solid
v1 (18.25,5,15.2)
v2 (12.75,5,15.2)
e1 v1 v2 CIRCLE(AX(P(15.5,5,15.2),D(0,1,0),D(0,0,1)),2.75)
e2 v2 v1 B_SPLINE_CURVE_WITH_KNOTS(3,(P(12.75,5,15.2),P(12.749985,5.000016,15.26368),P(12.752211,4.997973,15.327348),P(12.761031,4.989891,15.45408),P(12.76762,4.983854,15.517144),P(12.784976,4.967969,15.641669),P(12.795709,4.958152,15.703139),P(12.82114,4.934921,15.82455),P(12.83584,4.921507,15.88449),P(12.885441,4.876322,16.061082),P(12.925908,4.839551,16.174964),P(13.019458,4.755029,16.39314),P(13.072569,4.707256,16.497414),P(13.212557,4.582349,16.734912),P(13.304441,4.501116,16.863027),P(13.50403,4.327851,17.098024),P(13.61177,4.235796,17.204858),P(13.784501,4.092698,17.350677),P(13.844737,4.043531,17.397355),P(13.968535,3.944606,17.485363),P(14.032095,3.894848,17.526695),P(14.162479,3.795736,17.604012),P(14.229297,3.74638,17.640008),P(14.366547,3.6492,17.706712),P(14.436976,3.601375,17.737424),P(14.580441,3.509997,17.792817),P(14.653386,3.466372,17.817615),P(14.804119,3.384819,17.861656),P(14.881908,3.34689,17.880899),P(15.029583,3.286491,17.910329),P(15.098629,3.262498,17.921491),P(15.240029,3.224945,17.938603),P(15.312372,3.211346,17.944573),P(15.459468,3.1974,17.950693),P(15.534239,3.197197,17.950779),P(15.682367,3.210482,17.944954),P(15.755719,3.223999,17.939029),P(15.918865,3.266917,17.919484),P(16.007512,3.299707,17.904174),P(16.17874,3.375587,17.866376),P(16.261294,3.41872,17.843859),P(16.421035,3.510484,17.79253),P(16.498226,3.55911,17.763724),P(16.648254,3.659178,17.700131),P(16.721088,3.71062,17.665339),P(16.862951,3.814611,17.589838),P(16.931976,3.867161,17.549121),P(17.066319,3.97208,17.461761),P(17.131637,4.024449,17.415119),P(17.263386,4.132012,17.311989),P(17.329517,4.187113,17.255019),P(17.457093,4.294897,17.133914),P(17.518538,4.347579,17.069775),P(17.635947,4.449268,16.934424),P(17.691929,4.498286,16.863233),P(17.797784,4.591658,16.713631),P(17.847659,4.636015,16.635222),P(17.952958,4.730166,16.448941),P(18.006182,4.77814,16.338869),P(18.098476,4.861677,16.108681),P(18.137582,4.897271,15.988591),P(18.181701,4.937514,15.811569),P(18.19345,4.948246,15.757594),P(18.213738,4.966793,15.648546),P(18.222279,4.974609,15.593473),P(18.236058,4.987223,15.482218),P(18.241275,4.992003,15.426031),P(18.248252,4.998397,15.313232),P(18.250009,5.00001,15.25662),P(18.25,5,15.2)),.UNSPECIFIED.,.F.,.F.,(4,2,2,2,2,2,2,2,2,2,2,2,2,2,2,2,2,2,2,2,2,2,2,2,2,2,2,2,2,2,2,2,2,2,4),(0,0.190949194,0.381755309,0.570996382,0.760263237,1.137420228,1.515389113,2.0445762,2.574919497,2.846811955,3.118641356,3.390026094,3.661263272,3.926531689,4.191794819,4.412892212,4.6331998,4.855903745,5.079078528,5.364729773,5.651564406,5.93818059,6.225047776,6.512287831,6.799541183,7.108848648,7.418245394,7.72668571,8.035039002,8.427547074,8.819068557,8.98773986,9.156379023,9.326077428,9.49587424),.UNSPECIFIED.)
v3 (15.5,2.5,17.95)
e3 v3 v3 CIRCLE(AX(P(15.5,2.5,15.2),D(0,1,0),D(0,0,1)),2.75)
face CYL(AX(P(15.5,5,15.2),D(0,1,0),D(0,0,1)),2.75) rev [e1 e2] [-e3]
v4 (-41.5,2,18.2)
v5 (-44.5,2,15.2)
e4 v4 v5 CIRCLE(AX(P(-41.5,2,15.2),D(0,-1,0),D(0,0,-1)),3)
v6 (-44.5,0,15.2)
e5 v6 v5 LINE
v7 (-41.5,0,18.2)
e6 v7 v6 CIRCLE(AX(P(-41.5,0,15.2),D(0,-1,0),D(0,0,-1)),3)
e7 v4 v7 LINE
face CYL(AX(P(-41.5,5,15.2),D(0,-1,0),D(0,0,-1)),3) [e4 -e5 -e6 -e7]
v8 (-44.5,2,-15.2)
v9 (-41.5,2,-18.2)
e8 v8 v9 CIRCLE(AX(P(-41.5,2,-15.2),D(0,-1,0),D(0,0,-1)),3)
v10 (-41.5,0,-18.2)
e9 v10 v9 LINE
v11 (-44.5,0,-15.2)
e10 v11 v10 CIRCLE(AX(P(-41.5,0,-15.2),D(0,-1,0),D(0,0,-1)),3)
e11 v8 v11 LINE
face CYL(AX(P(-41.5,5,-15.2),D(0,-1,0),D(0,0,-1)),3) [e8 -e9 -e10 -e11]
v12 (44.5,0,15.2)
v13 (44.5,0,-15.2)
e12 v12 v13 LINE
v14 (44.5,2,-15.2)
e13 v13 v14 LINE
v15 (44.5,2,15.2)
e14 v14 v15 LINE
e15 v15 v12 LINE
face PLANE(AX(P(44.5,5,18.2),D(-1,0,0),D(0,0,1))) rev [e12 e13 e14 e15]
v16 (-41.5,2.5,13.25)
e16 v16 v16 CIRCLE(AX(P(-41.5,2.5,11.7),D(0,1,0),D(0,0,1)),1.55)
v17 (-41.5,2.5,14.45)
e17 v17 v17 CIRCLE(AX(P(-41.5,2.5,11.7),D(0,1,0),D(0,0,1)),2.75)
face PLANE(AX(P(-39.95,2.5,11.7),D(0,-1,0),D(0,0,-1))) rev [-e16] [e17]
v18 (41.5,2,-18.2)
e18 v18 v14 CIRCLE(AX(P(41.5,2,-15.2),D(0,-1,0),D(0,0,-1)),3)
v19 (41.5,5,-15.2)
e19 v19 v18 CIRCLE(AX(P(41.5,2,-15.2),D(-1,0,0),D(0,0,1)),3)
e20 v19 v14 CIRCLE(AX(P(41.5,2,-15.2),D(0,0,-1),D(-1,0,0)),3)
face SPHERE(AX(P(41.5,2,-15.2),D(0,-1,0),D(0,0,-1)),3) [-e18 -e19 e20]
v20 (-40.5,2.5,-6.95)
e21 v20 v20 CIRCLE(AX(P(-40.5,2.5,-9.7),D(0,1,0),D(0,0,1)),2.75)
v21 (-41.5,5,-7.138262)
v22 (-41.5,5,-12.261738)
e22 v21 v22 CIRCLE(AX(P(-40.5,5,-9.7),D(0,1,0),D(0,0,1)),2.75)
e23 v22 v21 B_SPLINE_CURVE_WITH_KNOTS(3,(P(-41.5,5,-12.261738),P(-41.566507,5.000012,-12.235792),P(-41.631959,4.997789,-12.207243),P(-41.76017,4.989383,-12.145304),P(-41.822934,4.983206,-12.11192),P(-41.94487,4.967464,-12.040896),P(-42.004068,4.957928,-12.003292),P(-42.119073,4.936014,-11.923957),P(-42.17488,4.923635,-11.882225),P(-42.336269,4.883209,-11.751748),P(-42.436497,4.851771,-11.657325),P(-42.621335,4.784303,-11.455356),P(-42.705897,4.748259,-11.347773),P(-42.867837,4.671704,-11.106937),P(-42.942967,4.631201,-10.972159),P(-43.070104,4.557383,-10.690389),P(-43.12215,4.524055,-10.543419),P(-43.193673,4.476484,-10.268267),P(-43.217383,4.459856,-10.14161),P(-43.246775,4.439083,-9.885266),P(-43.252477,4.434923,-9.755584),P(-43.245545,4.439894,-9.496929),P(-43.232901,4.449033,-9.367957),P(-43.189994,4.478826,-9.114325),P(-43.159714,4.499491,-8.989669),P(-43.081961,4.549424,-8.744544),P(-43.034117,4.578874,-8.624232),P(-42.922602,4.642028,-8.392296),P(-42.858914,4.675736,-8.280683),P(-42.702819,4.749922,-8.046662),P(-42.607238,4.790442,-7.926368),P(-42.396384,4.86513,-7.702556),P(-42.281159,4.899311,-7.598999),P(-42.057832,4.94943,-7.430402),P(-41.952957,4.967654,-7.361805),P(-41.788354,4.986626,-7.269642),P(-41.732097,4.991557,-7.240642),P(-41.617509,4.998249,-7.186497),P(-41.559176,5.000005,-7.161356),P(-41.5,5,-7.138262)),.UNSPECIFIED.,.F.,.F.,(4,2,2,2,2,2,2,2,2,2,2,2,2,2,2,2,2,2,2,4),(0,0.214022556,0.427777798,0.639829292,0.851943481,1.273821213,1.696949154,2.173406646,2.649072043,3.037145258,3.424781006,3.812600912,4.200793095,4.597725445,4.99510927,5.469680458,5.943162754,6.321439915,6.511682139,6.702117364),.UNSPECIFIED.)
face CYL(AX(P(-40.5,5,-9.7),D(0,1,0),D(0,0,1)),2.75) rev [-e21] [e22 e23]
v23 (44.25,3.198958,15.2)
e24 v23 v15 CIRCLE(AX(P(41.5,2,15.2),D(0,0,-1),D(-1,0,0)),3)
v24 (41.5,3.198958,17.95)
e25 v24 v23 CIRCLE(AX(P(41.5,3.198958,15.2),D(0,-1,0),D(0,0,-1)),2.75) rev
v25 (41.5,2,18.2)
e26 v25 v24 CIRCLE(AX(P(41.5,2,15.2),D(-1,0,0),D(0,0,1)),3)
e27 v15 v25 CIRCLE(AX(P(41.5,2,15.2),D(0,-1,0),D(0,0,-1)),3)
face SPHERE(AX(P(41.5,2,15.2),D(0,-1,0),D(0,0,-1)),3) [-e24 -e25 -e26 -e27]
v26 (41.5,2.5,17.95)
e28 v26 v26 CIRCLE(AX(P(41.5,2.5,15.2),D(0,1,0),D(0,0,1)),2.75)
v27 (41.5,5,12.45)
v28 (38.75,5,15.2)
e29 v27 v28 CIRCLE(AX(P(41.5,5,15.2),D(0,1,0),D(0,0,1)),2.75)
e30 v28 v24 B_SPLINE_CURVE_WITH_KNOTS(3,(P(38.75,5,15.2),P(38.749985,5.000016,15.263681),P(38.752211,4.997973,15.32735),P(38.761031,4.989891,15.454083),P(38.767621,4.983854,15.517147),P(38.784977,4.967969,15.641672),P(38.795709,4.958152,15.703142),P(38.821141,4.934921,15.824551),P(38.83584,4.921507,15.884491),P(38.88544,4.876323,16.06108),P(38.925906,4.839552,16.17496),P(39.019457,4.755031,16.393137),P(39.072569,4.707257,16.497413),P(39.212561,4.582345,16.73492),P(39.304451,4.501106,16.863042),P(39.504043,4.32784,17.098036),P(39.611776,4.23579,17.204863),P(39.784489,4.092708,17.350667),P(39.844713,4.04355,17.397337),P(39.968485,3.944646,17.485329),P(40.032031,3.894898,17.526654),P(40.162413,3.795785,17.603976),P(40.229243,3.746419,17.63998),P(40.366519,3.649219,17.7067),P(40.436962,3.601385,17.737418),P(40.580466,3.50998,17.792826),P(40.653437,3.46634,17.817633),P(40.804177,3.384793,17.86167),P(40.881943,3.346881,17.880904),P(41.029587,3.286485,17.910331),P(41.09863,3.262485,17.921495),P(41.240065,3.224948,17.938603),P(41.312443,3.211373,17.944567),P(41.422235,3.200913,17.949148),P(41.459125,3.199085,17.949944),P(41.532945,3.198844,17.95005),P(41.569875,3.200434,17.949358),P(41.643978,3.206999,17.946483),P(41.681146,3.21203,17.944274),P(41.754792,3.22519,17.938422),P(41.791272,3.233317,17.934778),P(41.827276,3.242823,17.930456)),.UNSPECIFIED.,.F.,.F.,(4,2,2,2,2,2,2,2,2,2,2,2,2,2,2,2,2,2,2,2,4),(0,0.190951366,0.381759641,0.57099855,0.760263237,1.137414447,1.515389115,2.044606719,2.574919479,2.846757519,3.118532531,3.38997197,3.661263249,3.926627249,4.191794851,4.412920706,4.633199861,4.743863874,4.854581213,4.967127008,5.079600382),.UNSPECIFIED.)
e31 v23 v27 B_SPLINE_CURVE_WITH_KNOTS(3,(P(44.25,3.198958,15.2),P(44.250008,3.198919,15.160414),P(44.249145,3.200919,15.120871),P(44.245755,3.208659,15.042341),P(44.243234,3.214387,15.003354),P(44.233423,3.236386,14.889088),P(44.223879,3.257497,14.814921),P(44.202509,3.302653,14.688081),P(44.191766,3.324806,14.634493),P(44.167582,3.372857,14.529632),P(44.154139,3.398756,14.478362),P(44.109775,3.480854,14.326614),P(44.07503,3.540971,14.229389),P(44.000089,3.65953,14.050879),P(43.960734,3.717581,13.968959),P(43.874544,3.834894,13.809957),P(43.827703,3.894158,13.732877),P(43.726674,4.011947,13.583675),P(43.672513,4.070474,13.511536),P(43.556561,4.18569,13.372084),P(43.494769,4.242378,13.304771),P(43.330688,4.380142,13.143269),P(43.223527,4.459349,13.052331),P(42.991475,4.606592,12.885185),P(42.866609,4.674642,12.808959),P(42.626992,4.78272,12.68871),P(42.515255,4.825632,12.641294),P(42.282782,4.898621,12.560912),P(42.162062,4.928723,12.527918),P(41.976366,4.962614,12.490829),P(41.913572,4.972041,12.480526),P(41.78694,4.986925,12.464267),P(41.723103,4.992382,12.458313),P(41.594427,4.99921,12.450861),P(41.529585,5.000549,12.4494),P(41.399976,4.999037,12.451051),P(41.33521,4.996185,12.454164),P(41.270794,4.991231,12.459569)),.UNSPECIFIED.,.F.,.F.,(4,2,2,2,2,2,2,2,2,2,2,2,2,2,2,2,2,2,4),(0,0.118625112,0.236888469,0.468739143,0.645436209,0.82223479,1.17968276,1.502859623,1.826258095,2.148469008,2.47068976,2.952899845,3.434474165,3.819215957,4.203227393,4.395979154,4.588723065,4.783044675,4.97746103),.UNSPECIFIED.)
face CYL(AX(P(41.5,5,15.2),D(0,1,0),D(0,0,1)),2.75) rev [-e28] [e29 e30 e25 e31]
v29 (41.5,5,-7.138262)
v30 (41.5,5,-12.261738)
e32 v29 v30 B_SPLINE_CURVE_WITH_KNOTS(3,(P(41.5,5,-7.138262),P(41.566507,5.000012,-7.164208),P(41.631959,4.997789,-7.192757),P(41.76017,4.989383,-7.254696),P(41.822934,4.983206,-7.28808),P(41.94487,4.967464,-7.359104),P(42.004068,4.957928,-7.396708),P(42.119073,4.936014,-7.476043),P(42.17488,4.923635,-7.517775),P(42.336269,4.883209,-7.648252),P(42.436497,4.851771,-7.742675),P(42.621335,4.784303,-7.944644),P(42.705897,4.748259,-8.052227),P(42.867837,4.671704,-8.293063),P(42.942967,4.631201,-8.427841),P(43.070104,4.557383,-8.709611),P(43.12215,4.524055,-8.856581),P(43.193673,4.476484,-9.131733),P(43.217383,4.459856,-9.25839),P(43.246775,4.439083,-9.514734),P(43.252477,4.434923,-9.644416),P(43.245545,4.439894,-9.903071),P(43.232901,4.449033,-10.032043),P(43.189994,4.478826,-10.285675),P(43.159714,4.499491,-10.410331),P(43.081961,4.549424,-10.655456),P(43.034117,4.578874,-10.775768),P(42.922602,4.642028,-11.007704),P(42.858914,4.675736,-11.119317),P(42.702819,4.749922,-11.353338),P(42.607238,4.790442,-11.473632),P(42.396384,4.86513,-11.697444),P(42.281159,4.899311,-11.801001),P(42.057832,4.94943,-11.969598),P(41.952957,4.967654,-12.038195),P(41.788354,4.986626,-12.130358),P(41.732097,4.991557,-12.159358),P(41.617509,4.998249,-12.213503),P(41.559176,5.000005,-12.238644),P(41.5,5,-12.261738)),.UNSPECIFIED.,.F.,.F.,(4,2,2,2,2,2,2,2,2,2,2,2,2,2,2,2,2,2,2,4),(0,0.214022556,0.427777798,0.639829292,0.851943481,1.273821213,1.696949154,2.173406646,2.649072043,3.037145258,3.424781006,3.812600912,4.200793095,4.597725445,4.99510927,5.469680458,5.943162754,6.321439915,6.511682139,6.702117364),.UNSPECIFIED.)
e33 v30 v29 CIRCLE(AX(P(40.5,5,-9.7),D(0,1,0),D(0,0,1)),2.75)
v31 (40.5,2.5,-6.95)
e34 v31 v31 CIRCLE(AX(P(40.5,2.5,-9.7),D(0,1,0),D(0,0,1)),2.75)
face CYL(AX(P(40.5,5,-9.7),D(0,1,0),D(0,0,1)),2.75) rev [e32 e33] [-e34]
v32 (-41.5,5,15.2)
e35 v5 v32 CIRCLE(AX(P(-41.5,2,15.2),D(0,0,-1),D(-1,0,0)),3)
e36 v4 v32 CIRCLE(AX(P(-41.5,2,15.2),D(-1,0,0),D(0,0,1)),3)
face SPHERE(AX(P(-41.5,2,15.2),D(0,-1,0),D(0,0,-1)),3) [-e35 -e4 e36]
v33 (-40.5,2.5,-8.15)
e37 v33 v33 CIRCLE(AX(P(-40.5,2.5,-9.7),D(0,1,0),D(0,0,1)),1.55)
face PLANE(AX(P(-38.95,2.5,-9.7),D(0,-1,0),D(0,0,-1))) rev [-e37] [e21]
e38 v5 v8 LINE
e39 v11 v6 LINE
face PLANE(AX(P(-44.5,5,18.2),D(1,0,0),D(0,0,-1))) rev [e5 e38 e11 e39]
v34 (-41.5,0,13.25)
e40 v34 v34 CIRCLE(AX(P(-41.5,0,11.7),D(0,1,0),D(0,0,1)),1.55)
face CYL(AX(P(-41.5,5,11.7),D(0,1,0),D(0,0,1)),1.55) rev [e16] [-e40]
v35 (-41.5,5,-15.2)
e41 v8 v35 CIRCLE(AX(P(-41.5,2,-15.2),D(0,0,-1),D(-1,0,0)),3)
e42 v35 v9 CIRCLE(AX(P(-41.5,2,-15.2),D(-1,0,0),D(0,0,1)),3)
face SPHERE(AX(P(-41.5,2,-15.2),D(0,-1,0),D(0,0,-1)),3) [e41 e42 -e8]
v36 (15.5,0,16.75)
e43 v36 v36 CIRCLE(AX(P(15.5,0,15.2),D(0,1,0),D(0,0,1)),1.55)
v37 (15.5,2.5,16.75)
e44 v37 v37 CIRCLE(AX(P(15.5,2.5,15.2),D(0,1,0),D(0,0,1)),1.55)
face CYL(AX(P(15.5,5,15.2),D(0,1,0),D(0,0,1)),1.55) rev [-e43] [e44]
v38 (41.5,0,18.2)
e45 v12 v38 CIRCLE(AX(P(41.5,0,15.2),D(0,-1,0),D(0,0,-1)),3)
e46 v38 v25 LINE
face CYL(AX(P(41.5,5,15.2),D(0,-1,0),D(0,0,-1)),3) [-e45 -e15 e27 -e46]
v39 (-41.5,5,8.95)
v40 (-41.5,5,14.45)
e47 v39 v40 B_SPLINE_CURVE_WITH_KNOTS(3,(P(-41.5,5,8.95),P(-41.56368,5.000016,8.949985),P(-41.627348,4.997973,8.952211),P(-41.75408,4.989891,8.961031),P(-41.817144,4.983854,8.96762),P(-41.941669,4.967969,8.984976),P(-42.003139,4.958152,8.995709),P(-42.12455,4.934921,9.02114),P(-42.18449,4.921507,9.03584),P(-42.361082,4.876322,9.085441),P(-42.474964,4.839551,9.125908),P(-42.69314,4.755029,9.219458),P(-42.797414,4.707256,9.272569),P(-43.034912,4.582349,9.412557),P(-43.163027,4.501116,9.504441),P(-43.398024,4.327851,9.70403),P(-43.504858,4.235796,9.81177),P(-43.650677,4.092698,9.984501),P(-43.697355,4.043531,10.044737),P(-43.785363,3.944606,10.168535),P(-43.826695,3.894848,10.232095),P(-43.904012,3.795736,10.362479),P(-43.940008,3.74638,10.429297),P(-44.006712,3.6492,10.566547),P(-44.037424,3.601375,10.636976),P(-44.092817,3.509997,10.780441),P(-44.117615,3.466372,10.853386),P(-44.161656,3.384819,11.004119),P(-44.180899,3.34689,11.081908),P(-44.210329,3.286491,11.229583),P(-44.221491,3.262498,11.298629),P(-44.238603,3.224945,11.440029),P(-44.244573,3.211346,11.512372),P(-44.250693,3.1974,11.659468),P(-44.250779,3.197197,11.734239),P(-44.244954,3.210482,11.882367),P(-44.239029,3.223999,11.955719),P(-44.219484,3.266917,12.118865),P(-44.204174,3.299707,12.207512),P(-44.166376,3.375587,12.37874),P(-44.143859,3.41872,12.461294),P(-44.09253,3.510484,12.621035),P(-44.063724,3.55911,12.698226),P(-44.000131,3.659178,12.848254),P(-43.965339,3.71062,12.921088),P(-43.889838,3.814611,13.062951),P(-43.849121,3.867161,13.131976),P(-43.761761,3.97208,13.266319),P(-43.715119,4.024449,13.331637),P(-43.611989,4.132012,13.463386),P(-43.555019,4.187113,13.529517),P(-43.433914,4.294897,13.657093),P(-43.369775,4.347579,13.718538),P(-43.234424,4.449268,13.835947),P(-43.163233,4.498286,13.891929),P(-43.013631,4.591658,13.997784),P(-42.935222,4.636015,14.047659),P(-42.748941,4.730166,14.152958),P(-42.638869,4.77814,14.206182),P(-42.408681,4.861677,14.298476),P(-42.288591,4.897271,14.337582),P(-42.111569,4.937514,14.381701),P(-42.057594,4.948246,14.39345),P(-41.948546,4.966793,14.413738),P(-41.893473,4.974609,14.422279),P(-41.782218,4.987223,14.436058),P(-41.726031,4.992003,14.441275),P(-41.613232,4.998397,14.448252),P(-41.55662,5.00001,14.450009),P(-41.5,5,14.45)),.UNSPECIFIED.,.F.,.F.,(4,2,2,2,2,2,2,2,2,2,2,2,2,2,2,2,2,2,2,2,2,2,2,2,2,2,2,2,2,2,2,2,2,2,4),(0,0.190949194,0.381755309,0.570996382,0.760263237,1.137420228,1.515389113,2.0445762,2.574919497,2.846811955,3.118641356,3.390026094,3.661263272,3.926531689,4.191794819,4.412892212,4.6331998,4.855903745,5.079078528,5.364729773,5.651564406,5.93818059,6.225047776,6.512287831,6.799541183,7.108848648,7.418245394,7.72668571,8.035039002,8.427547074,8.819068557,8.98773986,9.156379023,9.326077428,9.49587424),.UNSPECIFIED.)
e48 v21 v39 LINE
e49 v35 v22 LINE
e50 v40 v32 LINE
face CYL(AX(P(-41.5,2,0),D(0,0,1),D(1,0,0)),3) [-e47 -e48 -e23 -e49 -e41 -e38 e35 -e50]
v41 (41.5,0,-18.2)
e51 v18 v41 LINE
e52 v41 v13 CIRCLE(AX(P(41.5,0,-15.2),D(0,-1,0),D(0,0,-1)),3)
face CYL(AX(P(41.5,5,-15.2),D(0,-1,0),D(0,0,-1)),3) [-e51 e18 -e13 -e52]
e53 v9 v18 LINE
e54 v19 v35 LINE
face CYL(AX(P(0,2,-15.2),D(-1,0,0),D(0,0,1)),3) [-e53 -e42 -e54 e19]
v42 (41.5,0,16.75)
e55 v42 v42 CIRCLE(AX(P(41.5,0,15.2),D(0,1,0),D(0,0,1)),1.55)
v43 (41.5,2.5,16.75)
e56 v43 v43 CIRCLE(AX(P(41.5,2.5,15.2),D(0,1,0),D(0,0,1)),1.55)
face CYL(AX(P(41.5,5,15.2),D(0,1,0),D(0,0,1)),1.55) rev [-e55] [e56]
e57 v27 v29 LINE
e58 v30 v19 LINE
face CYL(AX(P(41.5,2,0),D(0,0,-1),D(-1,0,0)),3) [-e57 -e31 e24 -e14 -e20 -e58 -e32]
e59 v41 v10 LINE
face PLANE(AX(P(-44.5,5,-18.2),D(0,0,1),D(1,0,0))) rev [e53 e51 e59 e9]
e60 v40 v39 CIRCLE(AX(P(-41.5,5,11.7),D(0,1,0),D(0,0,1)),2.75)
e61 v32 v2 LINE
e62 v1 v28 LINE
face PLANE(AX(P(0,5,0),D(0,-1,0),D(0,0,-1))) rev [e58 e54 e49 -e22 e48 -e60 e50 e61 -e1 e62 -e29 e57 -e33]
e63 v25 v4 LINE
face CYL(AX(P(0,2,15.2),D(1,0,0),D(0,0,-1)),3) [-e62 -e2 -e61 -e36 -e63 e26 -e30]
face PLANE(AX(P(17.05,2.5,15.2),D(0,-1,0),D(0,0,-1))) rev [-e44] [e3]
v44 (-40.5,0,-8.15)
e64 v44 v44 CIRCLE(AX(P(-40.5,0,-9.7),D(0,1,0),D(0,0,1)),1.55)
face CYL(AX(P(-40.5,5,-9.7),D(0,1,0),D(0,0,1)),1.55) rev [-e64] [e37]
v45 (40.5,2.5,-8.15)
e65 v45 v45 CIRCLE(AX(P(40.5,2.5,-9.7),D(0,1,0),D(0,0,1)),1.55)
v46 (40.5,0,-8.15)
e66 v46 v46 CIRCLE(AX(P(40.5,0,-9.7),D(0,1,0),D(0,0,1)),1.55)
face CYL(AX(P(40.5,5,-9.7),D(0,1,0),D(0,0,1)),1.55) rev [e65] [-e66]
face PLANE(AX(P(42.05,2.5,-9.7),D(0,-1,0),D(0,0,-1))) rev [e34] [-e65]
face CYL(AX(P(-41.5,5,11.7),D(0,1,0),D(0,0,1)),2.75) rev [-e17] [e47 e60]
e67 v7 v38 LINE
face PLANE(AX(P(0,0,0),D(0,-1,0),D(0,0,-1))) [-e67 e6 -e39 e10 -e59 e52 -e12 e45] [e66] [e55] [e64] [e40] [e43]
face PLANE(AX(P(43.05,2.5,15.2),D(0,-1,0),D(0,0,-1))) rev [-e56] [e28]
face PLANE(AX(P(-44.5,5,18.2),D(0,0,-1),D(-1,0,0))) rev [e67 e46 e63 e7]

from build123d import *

# Parameters (mm, degrees)
SKETCH1_W                        = 89
SKETCH1_H                        = 36.4
BOSS_EXTRUDE1_DEPTH              = 5
CBORE_FOR_M2_5_SHCS1_D           = 3.1
CBORE_FOR_M2_5_SHCS1_CBORE_D     = 5.5
CBORE_FOR_M2_5_SHCS1_CBORE_DEPTH = 2.5
FILLET3_R                        = 3
FILLET4_R                        = 3


with BuildPart() as part:
    # Sketch1 → Boss-Extrude1 (new body)
    with BuildSketch(Plane(origin=(0, 0, 0), x_dir=(1, 0, 0), z_dir=(0, 1, 0))):
        Rectangle(SKETCH1_W, SKETCH1_H)
    extrude(amount=BOSS_EXTRUDE1_DEPTH)

    # CBORE for M2.5 SHCS1 (through all)
    with Locations(Plane(origin=(0, 5, 0), x_dir=(1, 0, 0), z_dir=(0, 1, 0))):
        with Locations((-40.5, 9.7), (-41.5, -11.7), (15.5, -15.2), (41.5, -15.2), (40.5, 9.7)):
            CounterBoreHole(CBORE_FOR_M2_5_SHCS1_D / 2, CBORE_FOR_M2_5_SHCS1_CBORE_D / 2, CBORE_FOR_M2_5_SHCS1_CBORE_DEPTH)

    # Fillet3
    fillet3_edges = [part.edges().sort_by_distance(p)[0] for p in [
        (44.5, 2.5, 18.2),
        (-44.5, 2.5, 18.2),
        (-44.5, 2.5, -18.2),
        (44.5, 2.5, -18.2),
    ]]
    fillet(fillet3_edges, radius=FILLET3_R)

    # Fillet4
    # the kernel refuses this fillet: 3 mm, written as the material it takes off along each edge
    with BuildSketch(Plane(origin=(-41.5, 5, -15.2), x_dir=(-1, 0, 0), z_dir=(0, 0, 1))) as fillet4_piece_1:
        with BuildLine():
            CenterArc((3 - FILLET4_R, FILLET4_R), FILLET4_R, 270, 90)
            Line((3, FILLET4_R), (3, 0))
            Line((3, 0), (3 - FILLET4_R, 0))
        make_face()
    revolve(axis=Axis((-41.5, 5, -15.2), (0, -1, 0)), revolution_arc=90, mode=Mode.SUBTRACT)
    with BuildSketch(Plane(origin=(41.5, 5, -18.2), x_dir=(0, 0, 1), z_dir=(-1, 0, 0))) as fillet4_piece_2:
        with BuildLine():
            CenterArc((FILLET4_R, -FILLET4_R), FILLET4_R, 90, 90)
            Line((0, -FILLET4_R), (0, 0))
            Line((0, 0), (FILLET4_R, 0))
        make_face()
    extrude(amount=83, mode=Mode.SUBTRACT)
    with BuildSketch(Plane(origin=(41.5, 5, -15.2), x_dir=(1, 0, 0), z_dir=(0, 0, 1))) as fillet4_piece_3:
        with BuildLine():
            CenterArc((3 - FILLET4_R, -FILLET4_R), FILLET4_R, 0, 90)
            Line((3, -FILLET4_R), (3, 0))
            Line((3, 0), (3 - FILLET4_R, 0))
        make_face()
    revolve(axis=Axis((41.5, 5, -15.2), (0, 1, 0)), revolution_arc=90, mode=Mode.SUBTRACT)
    with BuildSketch(Plane(origin=(44.5, 5, 15.2), x_dir=(-1, 0, 0), z_dir=(0, 0, -1)), Plane(origin=(-44.5, 5, -15.2), x_dir=(1, 0, 0), z_dir=(0, 0, 1))) as fillet4_piece_4:
        with BuildLine():
            CenterArc((FILLET4_R, -FILLET4_R), FILLET4_R, 90, 90)
            Line((0, -FILLET4_R), (0, 0))
            Line((0, 0), (FILLET4_R, 0))
        make_face()
    extrude(amount=30.4, mode=Mode.SUBTRACT)
    with BuildSketch(Plane(origin=(-41.5, 5, 18.2), x_dir=(0, -1, 0), z_dir=(1, 0, 0))) as fillet4_piece_5:
        with BuildLine():
            CenterArc((FILLET4_R, FILLET4_R), FILLET4_R, 180, 90)
            Line((0, FILLET4_R), (0, 0))
            Line((0, 0), (FILLET4_R, 0))
        make_face()
    extrude(amount=83, mode=Mode.SUBTRACT)
    with BuildSketch(Plane(origin=(-41.5, 5, 15.2), x_dir=(0, 0, 1), z_dir=(1, 0, 0))) as fillet4_piece_6:
        with BuildLine():
            CenterArc((3 - FILLET4_R, FILLET4_R), FILLET4_R, 270, 90)
            Line((3 - FILLET4_R, 0), (3, 0))
            Line((3, 0), (3, FILLET4_R))
        make_face()
    revolve(axis=Axis((-41.5, 5, 15.2), (0, -1, 0)), revolution_arc=90, mode=Mode.SUBTRACT)
    with BuildSketch(Plane(origin=(41.5, 5, 15.2), x_dir=(0, 0, 1), z_dir=(-1, 0, 0))) as fillet4_piece_7:
        with BuildLine():
            CenterArc((3 - FILLET4_R, -FILLET4_R), FILLET4_R, 0, 90)
            Line((3 - FILLET4_R, 0), (3, 0))
            Line((3, 0), (3, -FILLET4_R))
        make_face()
    revolve(axis=Axis((41.5, 5, 15.2), (0, 1, 0)), revolution_arc=90, mode=Mode.SUBTRACT)


solid = part.part
